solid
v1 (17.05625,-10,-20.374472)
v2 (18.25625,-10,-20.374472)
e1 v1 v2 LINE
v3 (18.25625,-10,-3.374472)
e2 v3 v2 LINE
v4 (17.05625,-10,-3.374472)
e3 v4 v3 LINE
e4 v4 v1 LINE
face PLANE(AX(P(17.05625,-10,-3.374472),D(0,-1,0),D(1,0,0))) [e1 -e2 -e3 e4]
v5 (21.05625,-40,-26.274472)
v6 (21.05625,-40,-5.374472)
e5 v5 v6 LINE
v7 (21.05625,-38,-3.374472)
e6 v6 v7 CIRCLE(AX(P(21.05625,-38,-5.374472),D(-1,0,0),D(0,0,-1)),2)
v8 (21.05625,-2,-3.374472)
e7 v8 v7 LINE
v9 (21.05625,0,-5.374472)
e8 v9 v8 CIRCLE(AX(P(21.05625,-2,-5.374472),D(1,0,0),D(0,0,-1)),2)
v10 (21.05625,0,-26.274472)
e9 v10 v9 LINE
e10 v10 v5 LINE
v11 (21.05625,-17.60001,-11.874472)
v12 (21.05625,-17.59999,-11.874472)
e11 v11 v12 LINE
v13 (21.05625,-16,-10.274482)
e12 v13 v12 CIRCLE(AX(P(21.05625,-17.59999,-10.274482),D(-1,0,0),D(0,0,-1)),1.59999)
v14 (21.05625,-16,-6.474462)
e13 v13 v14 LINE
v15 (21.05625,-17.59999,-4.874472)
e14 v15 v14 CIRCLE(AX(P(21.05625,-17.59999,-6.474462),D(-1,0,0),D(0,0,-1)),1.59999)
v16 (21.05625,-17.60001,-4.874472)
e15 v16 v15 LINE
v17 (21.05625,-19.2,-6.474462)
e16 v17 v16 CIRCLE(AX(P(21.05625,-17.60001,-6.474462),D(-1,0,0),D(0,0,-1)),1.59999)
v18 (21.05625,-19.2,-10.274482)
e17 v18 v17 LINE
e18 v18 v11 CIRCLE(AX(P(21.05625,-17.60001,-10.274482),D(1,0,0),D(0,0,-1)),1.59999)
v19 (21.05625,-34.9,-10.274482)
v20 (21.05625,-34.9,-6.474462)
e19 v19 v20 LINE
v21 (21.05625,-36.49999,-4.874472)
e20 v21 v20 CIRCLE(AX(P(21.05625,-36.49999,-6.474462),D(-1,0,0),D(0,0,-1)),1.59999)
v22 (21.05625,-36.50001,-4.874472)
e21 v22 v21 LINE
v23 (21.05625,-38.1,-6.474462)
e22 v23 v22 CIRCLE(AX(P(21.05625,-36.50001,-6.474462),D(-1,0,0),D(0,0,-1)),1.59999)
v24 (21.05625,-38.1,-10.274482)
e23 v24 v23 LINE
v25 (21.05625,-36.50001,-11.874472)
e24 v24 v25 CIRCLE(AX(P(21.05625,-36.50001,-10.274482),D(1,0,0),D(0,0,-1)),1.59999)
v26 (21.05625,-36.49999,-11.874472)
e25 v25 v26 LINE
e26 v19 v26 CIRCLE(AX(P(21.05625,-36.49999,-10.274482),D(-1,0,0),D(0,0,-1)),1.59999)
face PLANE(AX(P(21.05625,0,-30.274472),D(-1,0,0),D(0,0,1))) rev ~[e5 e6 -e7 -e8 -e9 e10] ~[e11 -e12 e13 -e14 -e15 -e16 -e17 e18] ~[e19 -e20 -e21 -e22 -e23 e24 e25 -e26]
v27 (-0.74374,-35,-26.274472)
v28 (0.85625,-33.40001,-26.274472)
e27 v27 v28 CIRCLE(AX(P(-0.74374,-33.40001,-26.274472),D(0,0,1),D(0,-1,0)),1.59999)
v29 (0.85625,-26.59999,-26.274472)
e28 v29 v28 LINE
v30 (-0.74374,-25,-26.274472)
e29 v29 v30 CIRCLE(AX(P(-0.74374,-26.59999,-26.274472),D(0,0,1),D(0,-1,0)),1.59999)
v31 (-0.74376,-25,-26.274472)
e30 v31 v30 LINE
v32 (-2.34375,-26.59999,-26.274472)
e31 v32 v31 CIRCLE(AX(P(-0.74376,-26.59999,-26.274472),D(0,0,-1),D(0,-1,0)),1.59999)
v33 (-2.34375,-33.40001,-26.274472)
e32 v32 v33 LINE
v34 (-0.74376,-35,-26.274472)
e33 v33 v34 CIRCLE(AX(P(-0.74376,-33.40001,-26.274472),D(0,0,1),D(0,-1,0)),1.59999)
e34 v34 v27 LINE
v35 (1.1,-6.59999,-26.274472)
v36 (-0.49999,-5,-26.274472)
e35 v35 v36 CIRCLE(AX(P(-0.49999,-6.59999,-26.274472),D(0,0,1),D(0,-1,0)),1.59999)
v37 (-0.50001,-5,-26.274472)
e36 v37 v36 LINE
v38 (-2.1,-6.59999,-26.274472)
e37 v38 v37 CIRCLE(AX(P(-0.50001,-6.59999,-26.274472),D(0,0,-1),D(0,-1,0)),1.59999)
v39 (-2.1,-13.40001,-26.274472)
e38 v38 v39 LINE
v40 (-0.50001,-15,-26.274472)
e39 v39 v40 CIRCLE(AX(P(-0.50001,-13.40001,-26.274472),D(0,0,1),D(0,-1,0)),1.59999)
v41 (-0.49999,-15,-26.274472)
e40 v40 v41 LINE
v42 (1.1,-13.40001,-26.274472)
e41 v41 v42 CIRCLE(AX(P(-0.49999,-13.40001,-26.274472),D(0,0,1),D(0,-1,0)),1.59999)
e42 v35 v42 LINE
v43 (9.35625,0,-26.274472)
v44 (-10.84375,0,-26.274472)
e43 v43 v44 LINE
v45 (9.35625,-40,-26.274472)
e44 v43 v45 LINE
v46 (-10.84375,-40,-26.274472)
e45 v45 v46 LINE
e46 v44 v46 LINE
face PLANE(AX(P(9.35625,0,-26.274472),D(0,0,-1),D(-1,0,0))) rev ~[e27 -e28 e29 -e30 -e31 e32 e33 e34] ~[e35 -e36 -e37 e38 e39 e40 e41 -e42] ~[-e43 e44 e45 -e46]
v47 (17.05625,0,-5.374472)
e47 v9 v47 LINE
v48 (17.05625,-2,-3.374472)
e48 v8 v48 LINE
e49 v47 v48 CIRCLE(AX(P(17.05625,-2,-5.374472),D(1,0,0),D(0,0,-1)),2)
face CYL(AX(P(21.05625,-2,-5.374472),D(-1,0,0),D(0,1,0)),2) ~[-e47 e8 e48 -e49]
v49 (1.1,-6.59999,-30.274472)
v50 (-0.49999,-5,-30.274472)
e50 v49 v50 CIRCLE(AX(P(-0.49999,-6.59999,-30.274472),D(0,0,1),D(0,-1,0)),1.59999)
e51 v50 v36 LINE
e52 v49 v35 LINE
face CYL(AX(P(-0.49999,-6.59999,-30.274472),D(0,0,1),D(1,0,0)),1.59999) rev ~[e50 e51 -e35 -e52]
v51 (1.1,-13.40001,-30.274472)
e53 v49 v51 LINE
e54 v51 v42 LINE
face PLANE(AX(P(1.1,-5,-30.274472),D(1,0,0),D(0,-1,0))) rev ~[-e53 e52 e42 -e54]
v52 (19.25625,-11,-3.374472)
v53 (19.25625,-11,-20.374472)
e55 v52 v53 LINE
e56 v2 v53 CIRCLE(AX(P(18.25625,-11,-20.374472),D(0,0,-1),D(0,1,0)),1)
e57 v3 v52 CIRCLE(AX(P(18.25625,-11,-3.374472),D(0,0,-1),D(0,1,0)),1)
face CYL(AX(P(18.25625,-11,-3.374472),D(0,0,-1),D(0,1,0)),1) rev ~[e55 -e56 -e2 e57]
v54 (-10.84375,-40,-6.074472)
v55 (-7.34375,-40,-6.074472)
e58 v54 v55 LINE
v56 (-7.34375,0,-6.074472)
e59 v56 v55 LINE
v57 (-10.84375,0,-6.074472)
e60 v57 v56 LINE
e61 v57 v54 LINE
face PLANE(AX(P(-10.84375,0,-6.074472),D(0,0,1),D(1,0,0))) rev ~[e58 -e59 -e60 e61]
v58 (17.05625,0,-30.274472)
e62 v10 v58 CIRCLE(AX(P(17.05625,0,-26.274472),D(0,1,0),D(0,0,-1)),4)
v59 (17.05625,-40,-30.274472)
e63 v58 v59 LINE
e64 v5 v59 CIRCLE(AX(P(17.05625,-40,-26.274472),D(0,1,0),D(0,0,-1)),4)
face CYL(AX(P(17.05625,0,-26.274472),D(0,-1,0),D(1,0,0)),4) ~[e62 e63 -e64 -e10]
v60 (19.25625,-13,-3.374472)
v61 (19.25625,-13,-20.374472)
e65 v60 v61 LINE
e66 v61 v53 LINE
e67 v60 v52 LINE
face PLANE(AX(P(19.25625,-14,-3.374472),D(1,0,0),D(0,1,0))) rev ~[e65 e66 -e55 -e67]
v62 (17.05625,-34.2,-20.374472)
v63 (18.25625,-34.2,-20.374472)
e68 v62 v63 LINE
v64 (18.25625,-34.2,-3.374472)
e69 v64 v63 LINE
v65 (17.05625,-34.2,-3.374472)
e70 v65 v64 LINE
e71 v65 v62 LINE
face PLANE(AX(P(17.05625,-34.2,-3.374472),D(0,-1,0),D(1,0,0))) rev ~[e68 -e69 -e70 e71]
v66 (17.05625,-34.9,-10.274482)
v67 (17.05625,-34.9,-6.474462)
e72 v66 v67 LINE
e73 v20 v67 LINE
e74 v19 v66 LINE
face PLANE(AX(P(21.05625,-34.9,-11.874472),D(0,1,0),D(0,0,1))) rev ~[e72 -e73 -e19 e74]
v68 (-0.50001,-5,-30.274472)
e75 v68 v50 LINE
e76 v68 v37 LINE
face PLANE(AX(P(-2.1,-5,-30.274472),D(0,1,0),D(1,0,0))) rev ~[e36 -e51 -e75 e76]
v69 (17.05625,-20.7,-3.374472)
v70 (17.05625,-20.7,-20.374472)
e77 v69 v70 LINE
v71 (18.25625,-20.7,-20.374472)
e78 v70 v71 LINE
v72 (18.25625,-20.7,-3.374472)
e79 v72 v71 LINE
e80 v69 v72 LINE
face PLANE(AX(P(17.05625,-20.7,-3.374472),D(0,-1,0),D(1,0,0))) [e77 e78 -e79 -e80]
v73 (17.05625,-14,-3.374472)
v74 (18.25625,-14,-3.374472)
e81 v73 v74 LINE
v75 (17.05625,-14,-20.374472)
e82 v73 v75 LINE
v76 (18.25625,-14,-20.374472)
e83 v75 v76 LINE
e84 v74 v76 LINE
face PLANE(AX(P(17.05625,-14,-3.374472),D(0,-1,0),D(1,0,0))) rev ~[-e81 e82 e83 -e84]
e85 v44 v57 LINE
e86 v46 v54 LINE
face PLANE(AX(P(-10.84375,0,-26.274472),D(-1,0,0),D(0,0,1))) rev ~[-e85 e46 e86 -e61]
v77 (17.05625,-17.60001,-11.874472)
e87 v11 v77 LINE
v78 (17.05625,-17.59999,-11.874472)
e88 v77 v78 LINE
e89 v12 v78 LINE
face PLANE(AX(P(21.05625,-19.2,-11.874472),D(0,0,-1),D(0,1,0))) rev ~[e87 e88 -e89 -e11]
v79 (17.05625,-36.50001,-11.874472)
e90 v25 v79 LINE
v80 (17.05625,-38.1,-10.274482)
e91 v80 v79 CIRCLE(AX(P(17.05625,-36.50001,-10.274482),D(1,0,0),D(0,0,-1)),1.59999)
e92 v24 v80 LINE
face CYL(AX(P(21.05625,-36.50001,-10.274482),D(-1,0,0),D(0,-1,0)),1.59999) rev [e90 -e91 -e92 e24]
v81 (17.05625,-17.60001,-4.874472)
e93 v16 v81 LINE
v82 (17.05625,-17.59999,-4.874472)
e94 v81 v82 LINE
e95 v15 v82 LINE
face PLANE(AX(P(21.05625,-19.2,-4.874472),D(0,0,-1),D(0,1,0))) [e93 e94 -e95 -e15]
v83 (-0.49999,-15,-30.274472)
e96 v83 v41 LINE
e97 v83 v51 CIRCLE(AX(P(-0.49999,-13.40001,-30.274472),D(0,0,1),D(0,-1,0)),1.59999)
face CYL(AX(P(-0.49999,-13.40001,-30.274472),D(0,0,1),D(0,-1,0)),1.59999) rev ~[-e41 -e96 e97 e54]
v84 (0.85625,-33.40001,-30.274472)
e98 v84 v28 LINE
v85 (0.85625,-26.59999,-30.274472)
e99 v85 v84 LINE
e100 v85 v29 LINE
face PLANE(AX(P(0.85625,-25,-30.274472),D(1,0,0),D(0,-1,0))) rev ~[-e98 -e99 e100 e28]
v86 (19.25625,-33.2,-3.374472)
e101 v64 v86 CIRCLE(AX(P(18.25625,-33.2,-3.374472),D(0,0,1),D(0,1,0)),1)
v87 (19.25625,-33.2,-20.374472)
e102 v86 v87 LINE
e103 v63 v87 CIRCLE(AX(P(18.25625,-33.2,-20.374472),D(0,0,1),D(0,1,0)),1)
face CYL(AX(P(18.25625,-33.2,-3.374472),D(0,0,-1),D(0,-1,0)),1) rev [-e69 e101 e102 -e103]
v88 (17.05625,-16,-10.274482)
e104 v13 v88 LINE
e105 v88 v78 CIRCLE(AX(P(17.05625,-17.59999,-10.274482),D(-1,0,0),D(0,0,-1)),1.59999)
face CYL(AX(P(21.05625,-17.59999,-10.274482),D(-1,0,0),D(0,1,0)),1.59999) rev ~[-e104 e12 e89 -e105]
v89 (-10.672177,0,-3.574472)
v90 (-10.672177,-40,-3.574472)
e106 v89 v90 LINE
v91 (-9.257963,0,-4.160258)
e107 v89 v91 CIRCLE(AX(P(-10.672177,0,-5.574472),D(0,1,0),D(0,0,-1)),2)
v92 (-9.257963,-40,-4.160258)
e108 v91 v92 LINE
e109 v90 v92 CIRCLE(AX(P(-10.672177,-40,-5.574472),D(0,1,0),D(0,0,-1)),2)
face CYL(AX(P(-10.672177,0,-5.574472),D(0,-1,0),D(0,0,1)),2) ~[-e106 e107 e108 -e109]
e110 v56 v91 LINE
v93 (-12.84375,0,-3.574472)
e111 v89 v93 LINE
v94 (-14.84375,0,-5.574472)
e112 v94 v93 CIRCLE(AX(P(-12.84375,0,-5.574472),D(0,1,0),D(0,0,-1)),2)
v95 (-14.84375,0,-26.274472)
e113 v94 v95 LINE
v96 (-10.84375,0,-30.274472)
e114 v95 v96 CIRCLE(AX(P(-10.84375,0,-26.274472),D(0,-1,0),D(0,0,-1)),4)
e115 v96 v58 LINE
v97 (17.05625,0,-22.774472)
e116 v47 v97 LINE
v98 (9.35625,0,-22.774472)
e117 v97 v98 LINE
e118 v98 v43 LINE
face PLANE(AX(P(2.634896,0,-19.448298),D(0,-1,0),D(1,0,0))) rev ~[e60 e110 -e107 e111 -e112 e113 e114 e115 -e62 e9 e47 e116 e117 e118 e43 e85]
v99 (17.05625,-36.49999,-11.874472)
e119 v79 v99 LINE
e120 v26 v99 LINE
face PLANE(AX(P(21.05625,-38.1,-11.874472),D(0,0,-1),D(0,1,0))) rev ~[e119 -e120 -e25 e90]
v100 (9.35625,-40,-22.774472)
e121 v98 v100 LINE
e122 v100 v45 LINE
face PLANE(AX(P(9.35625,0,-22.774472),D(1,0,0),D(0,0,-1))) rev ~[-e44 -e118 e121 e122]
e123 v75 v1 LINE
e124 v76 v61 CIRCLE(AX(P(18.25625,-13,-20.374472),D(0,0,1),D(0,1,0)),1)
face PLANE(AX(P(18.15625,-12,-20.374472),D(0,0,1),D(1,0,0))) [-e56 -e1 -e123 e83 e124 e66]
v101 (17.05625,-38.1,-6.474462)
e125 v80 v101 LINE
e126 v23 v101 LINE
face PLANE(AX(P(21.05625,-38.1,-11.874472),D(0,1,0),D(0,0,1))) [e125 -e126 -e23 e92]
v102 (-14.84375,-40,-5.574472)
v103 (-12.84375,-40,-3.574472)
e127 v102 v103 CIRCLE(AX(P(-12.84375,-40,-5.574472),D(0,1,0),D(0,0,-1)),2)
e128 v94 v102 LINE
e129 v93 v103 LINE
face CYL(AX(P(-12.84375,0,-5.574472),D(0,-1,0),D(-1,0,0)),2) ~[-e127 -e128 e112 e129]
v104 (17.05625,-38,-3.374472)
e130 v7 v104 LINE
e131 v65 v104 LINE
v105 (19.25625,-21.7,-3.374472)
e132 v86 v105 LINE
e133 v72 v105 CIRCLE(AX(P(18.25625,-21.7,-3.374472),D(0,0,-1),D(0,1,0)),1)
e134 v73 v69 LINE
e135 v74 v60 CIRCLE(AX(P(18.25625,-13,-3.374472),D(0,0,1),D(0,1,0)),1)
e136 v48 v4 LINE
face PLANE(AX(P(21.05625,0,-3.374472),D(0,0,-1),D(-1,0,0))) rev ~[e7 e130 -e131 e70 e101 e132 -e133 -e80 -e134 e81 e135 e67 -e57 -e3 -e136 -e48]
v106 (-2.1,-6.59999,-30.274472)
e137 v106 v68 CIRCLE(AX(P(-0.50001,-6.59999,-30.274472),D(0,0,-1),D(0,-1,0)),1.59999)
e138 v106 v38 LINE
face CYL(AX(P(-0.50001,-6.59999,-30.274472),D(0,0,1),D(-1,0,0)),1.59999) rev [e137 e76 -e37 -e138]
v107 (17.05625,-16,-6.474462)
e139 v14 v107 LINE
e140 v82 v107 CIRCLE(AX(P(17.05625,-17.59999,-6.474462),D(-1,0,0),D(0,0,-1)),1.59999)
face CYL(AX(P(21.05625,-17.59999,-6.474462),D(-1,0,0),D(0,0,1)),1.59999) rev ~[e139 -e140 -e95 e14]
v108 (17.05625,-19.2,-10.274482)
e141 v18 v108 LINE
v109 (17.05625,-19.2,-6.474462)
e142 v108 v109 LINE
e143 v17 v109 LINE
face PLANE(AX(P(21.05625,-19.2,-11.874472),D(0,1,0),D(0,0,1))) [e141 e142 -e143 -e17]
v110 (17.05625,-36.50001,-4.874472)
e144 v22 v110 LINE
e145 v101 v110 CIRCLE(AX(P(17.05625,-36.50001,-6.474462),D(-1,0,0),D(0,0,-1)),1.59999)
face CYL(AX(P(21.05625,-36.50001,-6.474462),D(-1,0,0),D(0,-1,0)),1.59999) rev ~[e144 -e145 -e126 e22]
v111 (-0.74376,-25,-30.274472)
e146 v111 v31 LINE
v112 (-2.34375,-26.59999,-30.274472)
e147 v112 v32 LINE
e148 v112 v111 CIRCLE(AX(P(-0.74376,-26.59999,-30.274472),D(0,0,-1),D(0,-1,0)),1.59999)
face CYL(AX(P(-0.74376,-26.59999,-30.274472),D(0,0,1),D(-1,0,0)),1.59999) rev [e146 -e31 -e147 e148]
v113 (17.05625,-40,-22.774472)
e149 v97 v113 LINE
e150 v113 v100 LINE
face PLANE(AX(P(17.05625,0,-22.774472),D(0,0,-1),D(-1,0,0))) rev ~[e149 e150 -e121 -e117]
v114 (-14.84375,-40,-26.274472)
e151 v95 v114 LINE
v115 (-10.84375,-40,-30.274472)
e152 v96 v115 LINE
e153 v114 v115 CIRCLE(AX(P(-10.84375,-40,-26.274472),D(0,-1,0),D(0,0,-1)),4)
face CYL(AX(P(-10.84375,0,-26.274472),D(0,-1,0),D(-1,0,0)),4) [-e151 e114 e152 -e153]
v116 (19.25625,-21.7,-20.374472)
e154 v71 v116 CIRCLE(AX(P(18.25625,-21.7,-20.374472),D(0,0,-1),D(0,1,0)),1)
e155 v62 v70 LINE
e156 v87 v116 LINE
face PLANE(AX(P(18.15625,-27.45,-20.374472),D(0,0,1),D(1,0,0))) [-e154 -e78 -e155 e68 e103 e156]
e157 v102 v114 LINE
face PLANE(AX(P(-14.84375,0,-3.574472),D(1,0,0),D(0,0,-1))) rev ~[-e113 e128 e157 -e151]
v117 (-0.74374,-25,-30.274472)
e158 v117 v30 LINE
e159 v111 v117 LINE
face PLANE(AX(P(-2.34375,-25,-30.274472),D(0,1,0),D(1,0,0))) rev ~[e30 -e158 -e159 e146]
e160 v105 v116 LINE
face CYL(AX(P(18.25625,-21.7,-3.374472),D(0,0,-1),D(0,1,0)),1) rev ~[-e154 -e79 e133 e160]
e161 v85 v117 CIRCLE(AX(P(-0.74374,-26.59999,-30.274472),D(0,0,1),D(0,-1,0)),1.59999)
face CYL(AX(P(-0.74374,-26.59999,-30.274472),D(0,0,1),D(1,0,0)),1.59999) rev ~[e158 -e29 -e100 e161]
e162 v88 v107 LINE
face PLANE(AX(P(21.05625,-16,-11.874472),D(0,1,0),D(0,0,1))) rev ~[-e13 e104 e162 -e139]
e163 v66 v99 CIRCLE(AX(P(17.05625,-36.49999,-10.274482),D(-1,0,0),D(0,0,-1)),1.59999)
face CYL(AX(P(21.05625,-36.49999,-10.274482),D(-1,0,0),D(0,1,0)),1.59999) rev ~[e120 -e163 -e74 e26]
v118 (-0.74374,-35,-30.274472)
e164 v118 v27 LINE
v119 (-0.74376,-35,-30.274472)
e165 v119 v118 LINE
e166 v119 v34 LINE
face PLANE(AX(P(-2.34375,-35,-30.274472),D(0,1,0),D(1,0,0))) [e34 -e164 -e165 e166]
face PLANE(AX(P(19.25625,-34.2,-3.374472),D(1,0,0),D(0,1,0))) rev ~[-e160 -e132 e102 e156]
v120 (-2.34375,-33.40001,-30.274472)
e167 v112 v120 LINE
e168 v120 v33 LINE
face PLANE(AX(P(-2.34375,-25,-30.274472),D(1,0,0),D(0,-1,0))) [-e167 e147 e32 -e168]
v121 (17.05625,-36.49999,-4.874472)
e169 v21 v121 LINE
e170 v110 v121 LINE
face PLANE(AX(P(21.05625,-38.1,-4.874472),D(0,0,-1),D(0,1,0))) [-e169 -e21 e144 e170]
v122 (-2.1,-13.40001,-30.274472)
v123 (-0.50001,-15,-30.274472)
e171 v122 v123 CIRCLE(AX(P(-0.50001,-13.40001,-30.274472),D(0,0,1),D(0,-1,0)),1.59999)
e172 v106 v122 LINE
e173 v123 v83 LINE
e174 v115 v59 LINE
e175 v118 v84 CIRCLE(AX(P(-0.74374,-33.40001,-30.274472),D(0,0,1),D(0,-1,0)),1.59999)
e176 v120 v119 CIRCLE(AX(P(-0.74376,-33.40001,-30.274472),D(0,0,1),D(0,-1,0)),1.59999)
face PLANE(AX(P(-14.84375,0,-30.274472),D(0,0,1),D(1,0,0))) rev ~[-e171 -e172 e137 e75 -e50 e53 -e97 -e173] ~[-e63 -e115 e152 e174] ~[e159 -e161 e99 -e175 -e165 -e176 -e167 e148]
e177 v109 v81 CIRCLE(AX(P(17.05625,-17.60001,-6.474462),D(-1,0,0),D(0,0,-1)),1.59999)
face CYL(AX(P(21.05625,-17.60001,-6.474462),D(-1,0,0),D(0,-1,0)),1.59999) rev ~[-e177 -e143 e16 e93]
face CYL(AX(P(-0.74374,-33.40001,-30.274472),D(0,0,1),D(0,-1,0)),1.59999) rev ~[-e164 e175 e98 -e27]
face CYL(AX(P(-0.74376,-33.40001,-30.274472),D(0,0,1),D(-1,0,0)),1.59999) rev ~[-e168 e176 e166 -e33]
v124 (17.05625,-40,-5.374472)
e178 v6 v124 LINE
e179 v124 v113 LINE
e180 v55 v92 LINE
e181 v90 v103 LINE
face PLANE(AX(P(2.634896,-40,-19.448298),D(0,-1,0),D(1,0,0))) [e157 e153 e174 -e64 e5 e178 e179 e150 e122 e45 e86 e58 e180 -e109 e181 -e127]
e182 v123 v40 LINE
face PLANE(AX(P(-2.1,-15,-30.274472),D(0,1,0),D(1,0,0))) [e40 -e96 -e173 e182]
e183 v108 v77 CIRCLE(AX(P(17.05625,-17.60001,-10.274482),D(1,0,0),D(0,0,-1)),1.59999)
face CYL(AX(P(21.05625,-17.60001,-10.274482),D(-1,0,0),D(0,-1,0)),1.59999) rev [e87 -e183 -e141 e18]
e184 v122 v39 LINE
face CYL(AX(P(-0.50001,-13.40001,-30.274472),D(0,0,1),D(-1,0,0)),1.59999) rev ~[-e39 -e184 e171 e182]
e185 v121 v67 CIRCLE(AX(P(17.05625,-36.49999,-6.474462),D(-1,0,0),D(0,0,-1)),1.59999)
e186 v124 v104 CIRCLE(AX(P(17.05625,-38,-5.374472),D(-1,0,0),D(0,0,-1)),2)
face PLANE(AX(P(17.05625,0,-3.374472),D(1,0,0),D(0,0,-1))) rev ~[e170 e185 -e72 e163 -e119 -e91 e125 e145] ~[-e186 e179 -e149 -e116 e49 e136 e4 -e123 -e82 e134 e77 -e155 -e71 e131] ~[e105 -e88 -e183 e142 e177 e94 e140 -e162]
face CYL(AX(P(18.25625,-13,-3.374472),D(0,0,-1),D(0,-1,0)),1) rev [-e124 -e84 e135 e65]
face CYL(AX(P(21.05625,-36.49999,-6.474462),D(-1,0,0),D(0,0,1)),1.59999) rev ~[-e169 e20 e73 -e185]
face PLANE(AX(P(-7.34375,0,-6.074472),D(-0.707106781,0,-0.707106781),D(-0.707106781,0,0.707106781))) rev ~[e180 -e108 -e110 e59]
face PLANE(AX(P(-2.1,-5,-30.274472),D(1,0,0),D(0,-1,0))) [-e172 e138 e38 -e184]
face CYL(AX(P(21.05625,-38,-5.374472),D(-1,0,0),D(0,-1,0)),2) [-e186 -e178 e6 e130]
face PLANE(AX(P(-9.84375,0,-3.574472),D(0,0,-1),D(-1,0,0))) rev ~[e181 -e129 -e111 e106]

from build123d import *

# Parameters (mm, degrees)
F1_DEPTH  = 40
F2_R      = 4
F3_R      = 2
F4_W      = 3.2
F4_H      = 7
F5_DEPTH  = 4
F6_R      = 1.59999
F7_W      = 3.2
F7_H      = 10
F8_DEPTH  = 4
F9_R      = 1.59999
F10_W     = 2.2
F10_H     = 4
F10_H_2   = 13.5
F11_DEPTH = 17
F12_R     = 2
F13_R     = 1
F14_R     = 2


# Not quite as in the source:
# - a fillet or chamfer is up to 0.001 mm smaller than in the source, because OpenCascade refuses the exact size


with BuildPart() as f1:
    # F0 (on Front) → F1 (new body)
    with BuildSketch(Plane.XZ):
        Polygon((21.0562500745, -30.2744720221), (21.0562500745, -3.3744720221), (17.0562500745, -3.3744720221), (17.0562500745, -22.7744720221), (9.3562500745, -22.7744720221), (9.3562500745, -26.2744720221), (-10.8437499255, -26.2744720221), (-10.8437499255, -6.0744720221), (-7.3437499255, -6.0744720221), (-9.8437499255, -3.5744720221), (-14.8437499255, -3.5744720221), (-14.8437499255, -30.2744720221), align=None)
    extrude(amount=F1_DEPTH)

    # F2
    f2_edges = [f1.edges().sort_by_distance(p)[0] for p in [
        (-14.84375, -20, -30.274472),
        (21.05625, -20, -30.274472),
    ]]
    fillet(f2_edges, radius=F2_R)

    # F3
    f3_edges = [f1.edges().sort_by_distance(p)[0] for p in [
        (-9.84375, -20, -3.574472),
    ]]
    fillet(f3_edges, radius=F3_R)

    # F4 (on face) → F5 (cut, through all)
    with BuildSketch(Plane.YZ.offset(21.0562500745)):
        with Locations((-17.6, -8.3744720221)):
            Rectangle(F4_W, F4_H)
        with Locations((-36.5, -8.3744720221)):
            Rectangle(F4_W, F4_H)
    extrude(amount=-F5_DEPTH, mode=Mode.SUBTRACT)

    # F6 (radius 1.6 in the source; OpenCascade refuses exactly that, so slightly less here)
    f6_edges = [f1.edges().sort_by_distance(p)[0] for p in [
        (19.05625, -19.2, -4.874472),
        (19.05625, -16, -4.874472),
        (19.05625, -16, -11.874472),
        (19.05625, -19.2, -11.874472),
        (19.05625, -38.1, -11.874472),
        (19.05625, -34.9, -11.874472),
        (19.05625, -34.9, -4.874472),
        (19.05625, -38.1, -4.874472),
    ]]
    fillet(f6_edges, radius=F6_R)

    # F7 (on face) → F8 (cut, through all)
    with BuildSketch(Plane(origin=(0, 0, -30.2744720221), x_dir=(1, 0, 0), z_dir=(0, 0, -1))):
        with Locations((-0.500000006, 10)):
            Rectangle(F7_W, F7_H)
        with Locations((-0.7437499255, 30)):
            Rectangle(F7_W, F7_H)
    extrude(amount=-F8_DEPTH, mode=Mode.SUBTRACT)

    # F9 (radius 1.6 in the source; OpenCascade refuses exactly that, so slightly less here)
    f9_edges = [f1.edges().sort_by_distance(p)[0] for p in [
        (0.85625, -35, -28.274472),
        (-2.34375, -35, -28.274472),
        (-2.1, -15, -28.274472),
        (1.1, -15, -28.274472),
        (0.85625, -25, -28.274472),
        (1.1, -5, -28.274472),
        (-2.34375, -25, -28.274472),
        (-2.1, -5, -28.274472),
    ]]
    fillet(f9_edges, radius=F9_R)

    # F10 (on face) → F11 (cut)
    with BuildSketch(Plane.XY.offset(-3.3744720221)):
        with Locations((18.1562500745, -12)):
            Rectangle(F10_W, F10_H)
        with Locations((18.1562500745, -27.45)):
            Rectangle(F10_W, F10_H_2)
    extrude(amount=-F11_DEPTH, mode=Mode.SUBTRACT)

    # F12
    f12_edges = [f1.edges().sort_by_distance(p)[0] for p in [
        (19.05625, -40, -3.374472),
        (19.05625, 0, -3.374472),
    ]]
    fillet(f12_edges, radius=F12_R)

    # F13
    f13_edges = [f1.edges().sort_by_distance(p)[0] for p in [
        (19.25625, -14, -11.874472),
        (19.25625, -10, -11.874472),
        (19.25625, -20.7, -11.874472),
        (19.25625, -34.2, -11.874472),
    ]]
    fillet(f13_edges, radius=F13_R)

    # F14
    f14_edges = [f1.edges().sort_by_distance(p)[0] for p in [
        (-14.84375, -20, -3.574472),
    ]]
    fillet(f14_edges, radius=F14_R)


solid = f1.part
